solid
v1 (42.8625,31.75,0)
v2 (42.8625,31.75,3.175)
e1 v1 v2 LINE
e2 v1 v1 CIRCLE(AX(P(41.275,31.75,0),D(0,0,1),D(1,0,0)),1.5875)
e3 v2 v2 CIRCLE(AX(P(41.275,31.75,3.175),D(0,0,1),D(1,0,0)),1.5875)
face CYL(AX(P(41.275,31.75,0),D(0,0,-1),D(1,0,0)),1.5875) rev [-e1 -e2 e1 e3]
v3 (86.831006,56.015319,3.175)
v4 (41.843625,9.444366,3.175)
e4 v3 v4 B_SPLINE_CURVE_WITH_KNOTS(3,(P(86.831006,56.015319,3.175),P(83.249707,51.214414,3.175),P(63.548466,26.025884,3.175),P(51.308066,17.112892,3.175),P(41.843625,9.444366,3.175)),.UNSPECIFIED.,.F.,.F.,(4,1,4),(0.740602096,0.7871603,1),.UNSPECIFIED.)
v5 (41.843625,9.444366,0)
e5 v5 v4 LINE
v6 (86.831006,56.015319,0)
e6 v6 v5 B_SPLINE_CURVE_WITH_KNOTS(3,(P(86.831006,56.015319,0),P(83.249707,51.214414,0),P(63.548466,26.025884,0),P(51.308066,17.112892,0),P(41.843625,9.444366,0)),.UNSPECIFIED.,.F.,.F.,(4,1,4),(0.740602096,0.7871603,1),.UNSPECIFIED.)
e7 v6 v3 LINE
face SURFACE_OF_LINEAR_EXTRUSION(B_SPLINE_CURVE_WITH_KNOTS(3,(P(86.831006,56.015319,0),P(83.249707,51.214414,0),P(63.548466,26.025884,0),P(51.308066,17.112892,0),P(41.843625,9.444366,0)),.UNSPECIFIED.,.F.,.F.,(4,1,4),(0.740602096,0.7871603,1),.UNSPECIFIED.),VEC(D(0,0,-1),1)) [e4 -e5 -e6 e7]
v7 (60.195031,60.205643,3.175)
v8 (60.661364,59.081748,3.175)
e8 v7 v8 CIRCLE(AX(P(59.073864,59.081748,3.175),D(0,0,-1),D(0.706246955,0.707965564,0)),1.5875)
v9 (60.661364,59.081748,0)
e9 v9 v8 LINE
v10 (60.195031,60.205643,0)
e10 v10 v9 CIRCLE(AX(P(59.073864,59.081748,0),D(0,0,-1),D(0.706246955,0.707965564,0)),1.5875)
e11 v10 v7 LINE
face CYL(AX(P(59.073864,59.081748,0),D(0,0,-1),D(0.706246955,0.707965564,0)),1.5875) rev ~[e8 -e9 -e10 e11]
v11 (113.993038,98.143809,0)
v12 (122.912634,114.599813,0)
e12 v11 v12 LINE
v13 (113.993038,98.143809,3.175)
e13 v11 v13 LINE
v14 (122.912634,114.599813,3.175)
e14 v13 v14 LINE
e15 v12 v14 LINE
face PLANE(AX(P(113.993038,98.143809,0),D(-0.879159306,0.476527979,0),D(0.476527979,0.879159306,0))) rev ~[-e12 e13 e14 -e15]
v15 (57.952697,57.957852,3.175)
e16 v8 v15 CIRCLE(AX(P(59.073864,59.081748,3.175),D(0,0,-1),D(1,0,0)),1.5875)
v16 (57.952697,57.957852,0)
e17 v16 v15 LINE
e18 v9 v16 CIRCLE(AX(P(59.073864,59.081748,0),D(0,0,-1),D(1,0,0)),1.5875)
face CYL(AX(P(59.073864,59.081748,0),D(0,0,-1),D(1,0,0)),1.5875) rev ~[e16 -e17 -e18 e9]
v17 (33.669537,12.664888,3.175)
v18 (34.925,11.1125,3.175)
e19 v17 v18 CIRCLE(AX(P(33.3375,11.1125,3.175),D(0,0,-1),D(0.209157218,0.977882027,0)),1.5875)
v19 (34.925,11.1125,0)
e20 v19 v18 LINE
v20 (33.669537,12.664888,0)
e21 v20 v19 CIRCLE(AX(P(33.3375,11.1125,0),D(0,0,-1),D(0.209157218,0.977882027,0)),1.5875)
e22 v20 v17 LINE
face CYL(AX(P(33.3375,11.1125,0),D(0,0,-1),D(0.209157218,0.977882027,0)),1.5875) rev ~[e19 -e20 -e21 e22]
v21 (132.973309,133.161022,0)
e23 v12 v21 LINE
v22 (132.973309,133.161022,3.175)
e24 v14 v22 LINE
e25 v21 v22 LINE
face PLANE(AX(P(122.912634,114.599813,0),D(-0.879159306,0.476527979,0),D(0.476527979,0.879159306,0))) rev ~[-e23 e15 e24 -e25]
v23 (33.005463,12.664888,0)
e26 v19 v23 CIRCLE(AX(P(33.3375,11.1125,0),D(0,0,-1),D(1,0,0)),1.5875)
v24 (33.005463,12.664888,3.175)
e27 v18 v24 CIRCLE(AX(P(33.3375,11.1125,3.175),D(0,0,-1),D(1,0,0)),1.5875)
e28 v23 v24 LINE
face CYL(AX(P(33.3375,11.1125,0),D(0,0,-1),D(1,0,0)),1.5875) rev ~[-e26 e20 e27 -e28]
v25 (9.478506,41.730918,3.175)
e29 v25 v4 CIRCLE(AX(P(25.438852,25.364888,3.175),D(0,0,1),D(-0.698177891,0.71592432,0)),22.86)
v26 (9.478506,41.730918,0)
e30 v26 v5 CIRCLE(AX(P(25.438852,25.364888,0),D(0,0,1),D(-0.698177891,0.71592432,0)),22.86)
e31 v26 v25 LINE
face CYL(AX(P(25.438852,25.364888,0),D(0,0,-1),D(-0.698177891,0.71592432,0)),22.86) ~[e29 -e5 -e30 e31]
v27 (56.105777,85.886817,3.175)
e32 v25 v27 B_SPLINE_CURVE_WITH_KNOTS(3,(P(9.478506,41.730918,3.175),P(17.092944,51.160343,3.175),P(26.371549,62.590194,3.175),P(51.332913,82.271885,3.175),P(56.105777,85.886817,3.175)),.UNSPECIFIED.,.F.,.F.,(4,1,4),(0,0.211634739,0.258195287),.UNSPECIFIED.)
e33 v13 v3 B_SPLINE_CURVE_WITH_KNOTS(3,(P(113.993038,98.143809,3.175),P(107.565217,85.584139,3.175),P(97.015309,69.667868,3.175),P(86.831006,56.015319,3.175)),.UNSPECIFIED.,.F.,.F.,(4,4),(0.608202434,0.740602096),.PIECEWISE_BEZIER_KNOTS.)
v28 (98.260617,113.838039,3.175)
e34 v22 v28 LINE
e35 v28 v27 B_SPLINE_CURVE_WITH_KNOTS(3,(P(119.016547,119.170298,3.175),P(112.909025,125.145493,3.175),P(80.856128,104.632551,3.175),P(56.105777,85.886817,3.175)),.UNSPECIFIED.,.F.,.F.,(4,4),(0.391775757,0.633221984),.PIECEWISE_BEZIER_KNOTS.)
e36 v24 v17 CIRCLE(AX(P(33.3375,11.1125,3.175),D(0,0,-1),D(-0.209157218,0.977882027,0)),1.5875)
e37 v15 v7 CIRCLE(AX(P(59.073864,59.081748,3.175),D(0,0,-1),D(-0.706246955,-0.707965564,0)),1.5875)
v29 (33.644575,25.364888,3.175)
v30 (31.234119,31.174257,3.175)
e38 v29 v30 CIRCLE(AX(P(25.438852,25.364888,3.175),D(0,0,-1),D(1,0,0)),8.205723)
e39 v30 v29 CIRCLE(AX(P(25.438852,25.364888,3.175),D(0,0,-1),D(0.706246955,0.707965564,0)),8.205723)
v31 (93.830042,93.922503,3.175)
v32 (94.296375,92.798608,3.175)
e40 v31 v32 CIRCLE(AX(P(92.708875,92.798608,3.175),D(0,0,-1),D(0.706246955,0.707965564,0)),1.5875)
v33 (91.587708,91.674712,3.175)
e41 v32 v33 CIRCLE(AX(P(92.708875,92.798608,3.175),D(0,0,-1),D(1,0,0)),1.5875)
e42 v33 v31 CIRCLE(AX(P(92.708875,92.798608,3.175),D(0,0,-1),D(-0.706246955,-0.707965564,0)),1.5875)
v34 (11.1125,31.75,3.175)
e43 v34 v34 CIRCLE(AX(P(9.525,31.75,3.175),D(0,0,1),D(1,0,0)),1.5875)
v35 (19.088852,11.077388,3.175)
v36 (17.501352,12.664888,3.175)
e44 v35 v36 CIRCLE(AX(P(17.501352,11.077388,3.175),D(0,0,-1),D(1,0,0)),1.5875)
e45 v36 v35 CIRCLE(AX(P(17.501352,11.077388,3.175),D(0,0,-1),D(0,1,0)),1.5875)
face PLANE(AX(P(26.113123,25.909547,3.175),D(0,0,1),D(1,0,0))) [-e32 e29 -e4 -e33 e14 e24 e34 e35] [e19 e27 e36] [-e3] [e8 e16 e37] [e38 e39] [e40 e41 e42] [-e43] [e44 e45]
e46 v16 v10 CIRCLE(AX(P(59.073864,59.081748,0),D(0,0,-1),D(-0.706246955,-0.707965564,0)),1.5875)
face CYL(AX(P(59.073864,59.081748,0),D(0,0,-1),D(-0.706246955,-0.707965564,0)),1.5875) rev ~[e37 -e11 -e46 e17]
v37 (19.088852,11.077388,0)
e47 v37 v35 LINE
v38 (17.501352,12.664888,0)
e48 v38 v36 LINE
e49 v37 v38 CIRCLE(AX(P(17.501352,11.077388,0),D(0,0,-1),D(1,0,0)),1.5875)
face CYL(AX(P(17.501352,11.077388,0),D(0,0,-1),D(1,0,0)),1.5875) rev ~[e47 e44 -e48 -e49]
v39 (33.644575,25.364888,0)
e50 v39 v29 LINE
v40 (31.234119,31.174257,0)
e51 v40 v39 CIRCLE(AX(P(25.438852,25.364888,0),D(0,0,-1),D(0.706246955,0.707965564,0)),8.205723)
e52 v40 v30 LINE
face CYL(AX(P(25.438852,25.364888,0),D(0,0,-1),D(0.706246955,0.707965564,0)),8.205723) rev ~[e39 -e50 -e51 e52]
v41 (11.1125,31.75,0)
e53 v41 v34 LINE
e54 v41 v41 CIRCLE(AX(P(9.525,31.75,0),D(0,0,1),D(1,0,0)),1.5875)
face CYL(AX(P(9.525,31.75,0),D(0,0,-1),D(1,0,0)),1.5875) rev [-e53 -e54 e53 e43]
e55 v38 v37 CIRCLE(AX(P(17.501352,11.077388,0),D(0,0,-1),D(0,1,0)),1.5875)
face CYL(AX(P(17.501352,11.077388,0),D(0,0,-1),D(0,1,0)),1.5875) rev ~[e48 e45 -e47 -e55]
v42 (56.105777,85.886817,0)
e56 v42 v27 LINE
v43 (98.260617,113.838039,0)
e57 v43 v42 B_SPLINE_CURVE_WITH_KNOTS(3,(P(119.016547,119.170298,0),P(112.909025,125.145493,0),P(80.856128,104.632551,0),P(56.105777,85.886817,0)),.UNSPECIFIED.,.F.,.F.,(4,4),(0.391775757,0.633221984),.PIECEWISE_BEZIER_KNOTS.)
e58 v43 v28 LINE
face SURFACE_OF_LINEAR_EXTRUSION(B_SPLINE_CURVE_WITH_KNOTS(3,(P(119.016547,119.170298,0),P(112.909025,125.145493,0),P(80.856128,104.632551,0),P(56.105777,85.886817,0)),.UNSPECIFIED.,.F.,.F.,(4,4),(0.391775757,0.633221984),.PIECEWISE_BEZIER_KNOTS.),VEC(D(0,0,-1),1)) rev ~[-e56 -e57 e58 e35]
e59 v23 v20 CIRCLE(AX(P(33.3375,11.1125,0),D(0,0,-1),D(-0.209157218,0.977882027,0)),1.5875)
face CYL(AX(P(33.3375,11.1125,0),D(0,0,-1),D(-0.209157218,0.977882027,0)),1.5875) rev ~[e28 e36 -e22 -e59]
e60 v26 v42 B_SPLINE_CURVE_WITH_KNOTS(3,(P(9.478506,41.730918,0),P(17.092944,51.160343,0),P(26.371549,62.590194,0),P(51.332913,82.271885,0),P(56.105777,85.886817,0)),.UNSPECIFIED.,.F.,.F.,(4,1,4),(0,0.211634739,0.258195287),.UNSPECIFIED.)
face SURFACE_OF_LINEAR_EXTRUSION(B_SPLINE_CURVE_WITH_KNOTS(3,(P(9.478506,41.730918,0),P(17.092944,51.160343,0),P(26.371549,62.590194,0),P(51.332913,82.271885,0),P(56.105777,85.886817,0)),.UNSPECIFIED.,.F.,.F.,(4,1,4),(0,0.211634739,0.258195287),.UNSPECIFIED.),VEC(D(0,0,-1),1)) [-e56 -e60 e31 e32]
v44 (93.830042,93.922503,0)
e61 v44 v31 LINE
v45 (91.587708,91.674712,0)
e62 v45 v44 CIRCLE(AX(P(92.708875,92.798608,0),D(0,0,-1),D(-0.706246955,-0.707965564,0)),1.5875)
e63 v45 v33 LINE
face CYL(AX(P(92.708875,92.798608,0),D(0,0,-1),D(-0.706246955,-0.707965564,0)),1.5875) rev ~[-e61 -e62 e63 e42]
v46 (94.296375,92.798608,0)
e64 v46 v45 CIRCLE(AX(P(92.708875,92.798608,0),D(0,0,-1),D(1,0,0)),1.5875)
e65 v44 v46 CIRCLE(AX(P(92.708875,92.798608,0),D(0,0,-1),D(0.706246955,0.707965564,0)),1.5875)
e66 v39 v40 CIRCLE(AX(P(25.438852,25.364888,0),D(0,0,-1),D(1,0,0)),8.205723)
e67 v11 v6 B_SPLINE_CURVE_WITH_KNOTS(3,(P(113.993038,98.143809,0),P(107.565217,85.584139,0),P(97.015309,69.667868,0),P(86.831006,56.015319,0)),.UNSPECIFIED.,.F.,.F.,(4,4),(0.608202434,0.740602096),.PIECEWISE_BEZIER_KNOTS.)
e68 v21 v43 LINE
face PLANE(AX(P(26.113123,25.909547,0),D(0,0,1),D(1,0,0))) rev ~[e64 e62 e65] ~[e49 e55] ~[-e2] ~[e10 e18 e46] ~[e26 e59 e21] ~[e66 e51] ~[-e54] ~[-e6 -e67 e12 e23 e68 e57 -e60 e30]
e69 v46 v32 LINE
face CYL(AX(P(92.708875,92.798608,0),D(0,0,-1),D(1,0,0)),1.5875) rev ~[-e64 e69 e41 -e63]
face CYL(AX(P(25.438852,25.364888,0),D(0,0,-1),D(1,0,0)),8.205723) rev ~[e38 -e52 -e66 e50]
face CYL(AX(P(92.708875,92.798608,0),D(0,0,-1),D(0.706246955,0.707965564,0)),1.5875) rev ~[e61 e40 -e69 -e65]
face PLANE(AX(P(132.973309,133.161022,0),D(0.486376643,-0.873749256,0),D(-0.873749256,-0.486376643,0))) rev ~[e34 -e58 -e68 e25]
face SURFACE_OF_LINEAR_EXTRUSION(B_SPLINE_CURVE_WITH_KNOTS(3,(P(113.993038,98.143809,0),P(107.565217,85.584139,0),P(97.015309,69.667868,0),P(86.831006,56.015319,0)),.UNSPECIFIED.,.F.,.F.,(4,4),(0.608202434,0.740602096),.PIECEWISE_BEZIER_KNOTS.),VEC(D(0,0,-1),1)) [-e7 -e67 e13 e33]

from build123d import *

# Parameters (mm, degrees)
F0_R     = 1.5875
F1_DEPTH = 3.175


with BuildPart() as f1:
    # F0 (on Top) → F1 (new body)
    with BuildSketch(Plane.XY):
        with BuildLine():
            ThreePointArc((48.298852367, 25.3648877175), (46.5534190331, 34.1258622353), (41.5836577474, 41.5489805011))
            ThreePointArc((41.5836577474, 41.5489805011), (25.5683959748, 48.2245206641), (9.478505781, 41.7309176838))
            ThreePointArc((9.478505781, 41.7309176838), (9.2940469865, 9.1807949339), (41.8436252726, 9.4443655555))
            ThreePointArc((41.8436252726, 9.4443655555), (46.6236666053, 16.7751702782), (48.298852367, 25.3648877175))
        make_face()
        with BuildLine():
            ThreePointArc((19.088852367, 11.0773877175), (16.3788203518, 9.9548557024), (17.501352367, 12.6648877175))
            ThreePointArc((17.501352367, 12.6648877175), (18.6238843821, 12.1999197327), (19.088852367, 11.0773877175))
        make_face(mode=Mode.SUBTRACT)
        with Locations((9.525, 31.75)):
            Circle(F0_R, mode=Mode.SUBTRACT)
        with BuildLine():
            Line((38.1080227106, 38.0648877175), (38.138852367, 38.0648877175))
            Line((38.138852367, 38.0648877175), (38.138852367, 12.6648877175))
            Line((38.138852367, 12.6648877175), (33.669537083, 12.6648877175))
            ThreePointArc((33.669537083, 12.6648877175), (34.5718551189, 12.110760332), (34.925, 11.1125))
            ThreePointArc((34.925, 11.1125), (32.339239668, 9.8781448811), (33.005462917, 12.6648877175))
            Line((33.005462917, 12.6648877175), (17.501352367, 12.6648877175))
            Line((17.501352367, 12.6648877175), (12.738852367, 12.6648877175))
            Line((12.738852367, 12.6648877175), (12.738852367, 38.0648877175))
            Line((12.738852367, 38.0648877175), (38.1080227106, 38.0648877175))
        make_face(mode=Mode.SUBTRACT)
        with Locations((41.275, 31.75)):
            Circle(F0_R, mode=Mode.SUBTRACT)
        with BuildLine():
            Line((57.9526965359, 57.9578523511), (41.5836577474, 41.5489805011))
            ThreePointArc((41.5836577474, 41.5489805011), (46.5534190331, 34.1258622353), (48.298852367, 25.3648877175))
            ThreePointArc((48.298852367, 25.3648877175), (46.6236666053, 16.7751702782), (41.8436252726, 9.4443655555))
            add(Edge.make_bspline(
                [(86.8310062503, 56.0153192292), (83.249706502, 51.2144143314), (63.5484661138, 26.0258843806), (51.3080659428, 17.112891847), (41.8436252726, 9.4443655555)],
                knots=[0.7406020956, 0.7406020956, 0.7406020956, 0.7406020956, 0.7871603002, 1, 1, 1, 1], degree=3))
            ThreePointArc((86.8310062503, 56.0153192292), (75.7950461349, 59.6100245839), (66.4012027896, 66.4269175316))
            Line((66.4012027896, 66.4269175316), (60.1950306165, 60.2056430155))
            ThreePointArc((60.1950306165, 60.2056430155), (60.540152928, 59.6901486915), (60.6613635762, 59.0817476833))
            ThreePointArc((60.6613635762, 59.0817476833), (59.6822645844, 57.6154583315), (57.9526965359, 57.9578523511))
        make_face()
        with BuildLine():
            ThreePointArc((9.478505781, 41.7309176838), (25.5683959748, 48.2245206641), (41.5836577474, 41.5489805011))
            Line((41.5836577474, 41.5489805011), (57.9526965359, 57.9578523511))
            ThreePointArc((57.9526965359, 57.9578523511), (57.949968244, 60.2029147236), (60.1950306165, 60.2056430155))
            Line((60.1950306165, 60.2056430155), (66.4012027896, 66.4269175316))
            ThreePointArc((66.4012027896, 66.4269175316), (59.7830008839, 75.3788925735), (56.1057766209, 85.88681698))
            add(Edge.make_bspline(
                [(9.478505781, 41.7309176838), (17.0929440337, 51.1603431722), (26.371548526, 62.5901940603), (51.3329129213, 82.2718852167), (56.1057766209, 85.88681698)],
                knots=[0, 0, 0, 0, 0.211634739, 0.2581952867, 0.2581952867, 0.2581952867, 0.2581952867], degree=3))
        make_face()
        with BuildLine():
            Line((89.1799820166, 89.261127534), (66.4012027896, 66.4269175316))
            ThreePointArc((66.4012027896, 66.4269175316), (75.7950461349, 59.6100245839), (86.8310062503, 56.0153192292))
            add(Edge.make_bspline(
                [(113.9930376147, 98.1438093202), (107.5652173309, 85.5841385514), (97.0153094729, 69.6678684875), (86.8310062503, 56.0153192292)],
                knots=[0.6082024344, 0.6082024344, 0.6082024344, 0.6082024344, 0.7406020956, 0.7406020956, 0.7406020956, 0.7406020956], degree=3))
            Line((113.9930376147, 98.1438093202), (105.9976837923, 106.1197541654))
            Line((105.9976837923, 106.1197541654), (96.2377675544, 96.3360877642))
            ThreePointArc((96.2377675544, 96.3360877642), (97.3240460353, 94.7135604092), (97.7055586597, 92.7986076491))
            ThreePointArc((97.7055586597, 92.7986076491), (94.6238275456, 88.1834363993), (89.1799820166, 89.261127534))
        make_face()
        with BuildLine():
            add(Edge.make_bspline(
                [(56.1057766209, 85.88681698), (69.7989441385, 96.2579210625), (85.7273267139, 107.1699447817), (98.2606169463, 113.8380390341)],
                knots=[0.2581952867, 0.2581952867, 0.2581952867, 0.2581952867, 0.3917757571, 0.3917757571, 0.3917757571, 0.3917757571], degree=3))
            ThreePointArc((56.1057766209, 85.88681698), (59.7830008839, 75.3788925735), (66.4012027896, 66.4269175316))
            Line((66.4012027896, 66.4269175316), (89.1799820166, 89.261127534))
            ThreePointArc((89.1799820166, 89.261127534), (89.1713946704, 96.327500418), (96.2377675544, 96.3360877642))
            Line((96.2377675544, 96.3360877642), (105.9976837923, 106.1197541654))
            Line((105.9976837923, 106.1197541654), (98.2606169463, 113.8380390341))
        make_face()
        with BuildLine():
            Line((38.138852367, 12.6648877175), (38.138852367, 38.0648877175))
            Line((38.138852367, 38.0648877175), (38.1080227106, 38.0648877175))
            Line((38.1080227106, 38.0648877175), (12.738852367, 38.0648877175))
            Line((12.738852367, 38.0648877175), (12.738852367, 12.6648877175))
            Line((12.738852367, 12.6648877175), (17.501352367, 12.6648877175))
            Line((17.501352367, 12.6648877175), (33.005462917, 12.6648877175))
            ThreePointArc((33.005462917, 12.6648877175), (33.3375, 12.7), (33.669537083, 12.6648877175))
            Line((33.669537083, 12.6648877175), (38.138852367, 12.6648877175))
        make_face()
        with BuildLine():
            ThreePointArc((33.6445749551, 25.3648877175), (17.8596626631, 22.2200877834), (31.2341189545, 31.1742567343))
            ThreePointArc((31.2341189545, 31.1742567343), (33.0180420708, 28.5096876517), (33.6445749551, 25.3648877175))
        make_face(mode=Mode.SUBTRACT)
        with BuildLine():
            Line((105.9976837923, 106.1197541654), (113.9930376147, 98.1438093202))
            add(Edge.make_bspline(
                [(119.0607801069, 119.1260976819), (121.7354589285, 116.3963605732), (119.2349256659, 108.3862220235), (113.9930376147, 98.1438093202)],
                knots=[0.5002304981, 0.5002304981, 0.5002304981, 0.5002304981, 0.6082024344, 0.6082024344, 0.6082024344, 0.6082024344], degree=3))
            ThreePointArc((119.0607801069, 119.1260976819), (119.038672719, 119.1482070061), (119.0165467814, 119.1702977666))
            Line((119.0165467814, 119.1702977666), (105.9976837923, 106.1197541654))
        make_face()
        with BuildLine():
            add(Edge.make_bspline(
                [(98.2606169463, 113.8380390341), (108.3812043908, 119.2225015111), (116.2880200857, 121.8397075452), (119.0165467814, 119.1702977666)],
                knots=[0.3917757571, 0.3917757571, 0.3917757571, 0.3917757571, 0.4996415136, 0.4996415136, 0.4996415136, 0.4996415136], degree=3))
            Line((98.2606169463, 113.8380390341), (105.9976837923, 106.1197541654))
            Line((105.9976837923, 106.1197541654), (119.0165467814, 119.1702977666))
        make_face()
        with BuildLine():
            Line((132.9733085625, 133.1610224797), (119.0165467814, 119.1702977666))
            add(Edge.make_bspline(
                [(119.0165467814, 119.1702977666), (119.0314454842, 119.1557218627), (119.0461897944, 119.1409883361), (119.0607801069, 119.1260976819)],
                knots=[0.4996415136, 0.4996415136, 0.4996415136, 0.4996415136, 0.5002304981, 0.5002304981, 0.5002304981, 0.5002304981], degree=3))
            ThreePointArc((119.0607801069, 119.1260976819), (121.0771249041, 116.9399007111), (122.9126341528, 114.5998132483))
            Line((122.9126341528, 114.5998132483), (132.9733085625, 133.1610224797))
        make_face()
        with BuildLine():
            Line((132.9733085625, 133.1610224797), (114.6029810942, 122.9350930852))
            ThreePointArc((114.6029810942, 122.9350930852), (116.8831644106, 121.1387446745), (119.0165467814, 119.1702977666))
            Line((119.0165467814, 119.1702977666), (132.9733085625, 133.1610224797))
        make_face()
        with BuildLine():
            ThreePointArc((96.2377675544, 96.3360877642), (89.1713946704, 96.327500418), (89.1799820166, 89.261127534))
            Line((89.1799820166, 89.261127534), (91.5877077452, 91.6747123169))
            ThreePointArc((91.5877077452, 91.6747123169), (91.5849794533, 93.9197746894), (93.8300418258, 93.9225029813))
            Line((93.8300418258, 93.9225029813), (96.2377675544, 96.3360877642))
        make_face()
        with BuildLine():
            Line((91.5877077452, 91.6747123169), (89.1799820166, 89.261127534))
            ThreePointArc((89.1799820166, 89.261127534), (94.6238275456, 88.1834363993), (97.7055586597, 92.7986076491))
            ThreePointArc((97.7055586597, 92.7986076491), (97.3240460353, 94.7135604092), (96.2377675544, 96.3360877642))
            Line((96.2377675544, 96.3360877642), (93.8300418258, 93.9225029813))
            ThreePointArc((93.8300418258, 93.9225029813), (94.1751641373, 93.4070086573), (94.2963747855, 92.7986076491))
            ThreePointArc((94.2963747855, 92.7986076491), (93.3172757937, 91.3323182973), (91.5877077452, 91.6747123169))
        make_face()
        with BuildLine():
            add(Edge.make_bspline(
                [(119.0607801069, 119.1260976819), (121.7354589285, 116.3963605732), (119.2349256659, 108.3862220235), (113.9930376147, 98.1438093202)],
                knots=[0.5002304981, 0.5002304981, 0.5002304981, 0.5002304981, 0.6082024344, 0.6082024344, 0.6082024344, 0.6082024344], degree=3))
            Line((113.9930376147, 98.1438093202), (122.9126341528, 114.5998132483))
            ThreePointArc((122.9126341528, 114.5998132483), (121.0771249041, 116.9399007111), (119.0607801069, 119.1260976819))
        make_face()
        with BuildLine():
            ThreePointArc((119.0165467814, 119.1702977666), (116.8831644106, 121.1387446745), (114.6029810942, 122.9350930852))
            Line((114.6029810942, 122.9350930852), (98.2606169463, 113.8380390341))
            add(Edge.make_bspline(
                [(98.2606169463, 113.8380390341), (108.3812043908, 119.2225015111), (116.2880200857, 121.8397075452), (119.0165467814, 119.1702977666)],
                knots=[0.3917757571, 0.3917757571, 0.3917757571, 0.3917757571, 0.4996415136, 0.4996415136, 0.4996415136, 0.4996415136], degree=3))
        make_face()
        with BuildLine():
            add(Edge.make_bspline(
                [(119.0165467814, 119.1702977666), (119.0314454842, 119.1557218627), (119.0461897944, 119.1409883361), (119.0607801069, 119.1260976819)],
                knots=[0.4996415136, 0.4996415136, 0.4996415136, 0.4996415136, 0.5002304981, 0.5002304981, 0.5002304981, 0.5002304981], degree=3))
            ThreePointArc((119.0165467814, 119.1702977666), (119.038672719, 119.1482070061), (119.0607801069, 119.1260976819))
        make_face()
    extrude(amount=F1_DEPTH)


solid = f1.part
